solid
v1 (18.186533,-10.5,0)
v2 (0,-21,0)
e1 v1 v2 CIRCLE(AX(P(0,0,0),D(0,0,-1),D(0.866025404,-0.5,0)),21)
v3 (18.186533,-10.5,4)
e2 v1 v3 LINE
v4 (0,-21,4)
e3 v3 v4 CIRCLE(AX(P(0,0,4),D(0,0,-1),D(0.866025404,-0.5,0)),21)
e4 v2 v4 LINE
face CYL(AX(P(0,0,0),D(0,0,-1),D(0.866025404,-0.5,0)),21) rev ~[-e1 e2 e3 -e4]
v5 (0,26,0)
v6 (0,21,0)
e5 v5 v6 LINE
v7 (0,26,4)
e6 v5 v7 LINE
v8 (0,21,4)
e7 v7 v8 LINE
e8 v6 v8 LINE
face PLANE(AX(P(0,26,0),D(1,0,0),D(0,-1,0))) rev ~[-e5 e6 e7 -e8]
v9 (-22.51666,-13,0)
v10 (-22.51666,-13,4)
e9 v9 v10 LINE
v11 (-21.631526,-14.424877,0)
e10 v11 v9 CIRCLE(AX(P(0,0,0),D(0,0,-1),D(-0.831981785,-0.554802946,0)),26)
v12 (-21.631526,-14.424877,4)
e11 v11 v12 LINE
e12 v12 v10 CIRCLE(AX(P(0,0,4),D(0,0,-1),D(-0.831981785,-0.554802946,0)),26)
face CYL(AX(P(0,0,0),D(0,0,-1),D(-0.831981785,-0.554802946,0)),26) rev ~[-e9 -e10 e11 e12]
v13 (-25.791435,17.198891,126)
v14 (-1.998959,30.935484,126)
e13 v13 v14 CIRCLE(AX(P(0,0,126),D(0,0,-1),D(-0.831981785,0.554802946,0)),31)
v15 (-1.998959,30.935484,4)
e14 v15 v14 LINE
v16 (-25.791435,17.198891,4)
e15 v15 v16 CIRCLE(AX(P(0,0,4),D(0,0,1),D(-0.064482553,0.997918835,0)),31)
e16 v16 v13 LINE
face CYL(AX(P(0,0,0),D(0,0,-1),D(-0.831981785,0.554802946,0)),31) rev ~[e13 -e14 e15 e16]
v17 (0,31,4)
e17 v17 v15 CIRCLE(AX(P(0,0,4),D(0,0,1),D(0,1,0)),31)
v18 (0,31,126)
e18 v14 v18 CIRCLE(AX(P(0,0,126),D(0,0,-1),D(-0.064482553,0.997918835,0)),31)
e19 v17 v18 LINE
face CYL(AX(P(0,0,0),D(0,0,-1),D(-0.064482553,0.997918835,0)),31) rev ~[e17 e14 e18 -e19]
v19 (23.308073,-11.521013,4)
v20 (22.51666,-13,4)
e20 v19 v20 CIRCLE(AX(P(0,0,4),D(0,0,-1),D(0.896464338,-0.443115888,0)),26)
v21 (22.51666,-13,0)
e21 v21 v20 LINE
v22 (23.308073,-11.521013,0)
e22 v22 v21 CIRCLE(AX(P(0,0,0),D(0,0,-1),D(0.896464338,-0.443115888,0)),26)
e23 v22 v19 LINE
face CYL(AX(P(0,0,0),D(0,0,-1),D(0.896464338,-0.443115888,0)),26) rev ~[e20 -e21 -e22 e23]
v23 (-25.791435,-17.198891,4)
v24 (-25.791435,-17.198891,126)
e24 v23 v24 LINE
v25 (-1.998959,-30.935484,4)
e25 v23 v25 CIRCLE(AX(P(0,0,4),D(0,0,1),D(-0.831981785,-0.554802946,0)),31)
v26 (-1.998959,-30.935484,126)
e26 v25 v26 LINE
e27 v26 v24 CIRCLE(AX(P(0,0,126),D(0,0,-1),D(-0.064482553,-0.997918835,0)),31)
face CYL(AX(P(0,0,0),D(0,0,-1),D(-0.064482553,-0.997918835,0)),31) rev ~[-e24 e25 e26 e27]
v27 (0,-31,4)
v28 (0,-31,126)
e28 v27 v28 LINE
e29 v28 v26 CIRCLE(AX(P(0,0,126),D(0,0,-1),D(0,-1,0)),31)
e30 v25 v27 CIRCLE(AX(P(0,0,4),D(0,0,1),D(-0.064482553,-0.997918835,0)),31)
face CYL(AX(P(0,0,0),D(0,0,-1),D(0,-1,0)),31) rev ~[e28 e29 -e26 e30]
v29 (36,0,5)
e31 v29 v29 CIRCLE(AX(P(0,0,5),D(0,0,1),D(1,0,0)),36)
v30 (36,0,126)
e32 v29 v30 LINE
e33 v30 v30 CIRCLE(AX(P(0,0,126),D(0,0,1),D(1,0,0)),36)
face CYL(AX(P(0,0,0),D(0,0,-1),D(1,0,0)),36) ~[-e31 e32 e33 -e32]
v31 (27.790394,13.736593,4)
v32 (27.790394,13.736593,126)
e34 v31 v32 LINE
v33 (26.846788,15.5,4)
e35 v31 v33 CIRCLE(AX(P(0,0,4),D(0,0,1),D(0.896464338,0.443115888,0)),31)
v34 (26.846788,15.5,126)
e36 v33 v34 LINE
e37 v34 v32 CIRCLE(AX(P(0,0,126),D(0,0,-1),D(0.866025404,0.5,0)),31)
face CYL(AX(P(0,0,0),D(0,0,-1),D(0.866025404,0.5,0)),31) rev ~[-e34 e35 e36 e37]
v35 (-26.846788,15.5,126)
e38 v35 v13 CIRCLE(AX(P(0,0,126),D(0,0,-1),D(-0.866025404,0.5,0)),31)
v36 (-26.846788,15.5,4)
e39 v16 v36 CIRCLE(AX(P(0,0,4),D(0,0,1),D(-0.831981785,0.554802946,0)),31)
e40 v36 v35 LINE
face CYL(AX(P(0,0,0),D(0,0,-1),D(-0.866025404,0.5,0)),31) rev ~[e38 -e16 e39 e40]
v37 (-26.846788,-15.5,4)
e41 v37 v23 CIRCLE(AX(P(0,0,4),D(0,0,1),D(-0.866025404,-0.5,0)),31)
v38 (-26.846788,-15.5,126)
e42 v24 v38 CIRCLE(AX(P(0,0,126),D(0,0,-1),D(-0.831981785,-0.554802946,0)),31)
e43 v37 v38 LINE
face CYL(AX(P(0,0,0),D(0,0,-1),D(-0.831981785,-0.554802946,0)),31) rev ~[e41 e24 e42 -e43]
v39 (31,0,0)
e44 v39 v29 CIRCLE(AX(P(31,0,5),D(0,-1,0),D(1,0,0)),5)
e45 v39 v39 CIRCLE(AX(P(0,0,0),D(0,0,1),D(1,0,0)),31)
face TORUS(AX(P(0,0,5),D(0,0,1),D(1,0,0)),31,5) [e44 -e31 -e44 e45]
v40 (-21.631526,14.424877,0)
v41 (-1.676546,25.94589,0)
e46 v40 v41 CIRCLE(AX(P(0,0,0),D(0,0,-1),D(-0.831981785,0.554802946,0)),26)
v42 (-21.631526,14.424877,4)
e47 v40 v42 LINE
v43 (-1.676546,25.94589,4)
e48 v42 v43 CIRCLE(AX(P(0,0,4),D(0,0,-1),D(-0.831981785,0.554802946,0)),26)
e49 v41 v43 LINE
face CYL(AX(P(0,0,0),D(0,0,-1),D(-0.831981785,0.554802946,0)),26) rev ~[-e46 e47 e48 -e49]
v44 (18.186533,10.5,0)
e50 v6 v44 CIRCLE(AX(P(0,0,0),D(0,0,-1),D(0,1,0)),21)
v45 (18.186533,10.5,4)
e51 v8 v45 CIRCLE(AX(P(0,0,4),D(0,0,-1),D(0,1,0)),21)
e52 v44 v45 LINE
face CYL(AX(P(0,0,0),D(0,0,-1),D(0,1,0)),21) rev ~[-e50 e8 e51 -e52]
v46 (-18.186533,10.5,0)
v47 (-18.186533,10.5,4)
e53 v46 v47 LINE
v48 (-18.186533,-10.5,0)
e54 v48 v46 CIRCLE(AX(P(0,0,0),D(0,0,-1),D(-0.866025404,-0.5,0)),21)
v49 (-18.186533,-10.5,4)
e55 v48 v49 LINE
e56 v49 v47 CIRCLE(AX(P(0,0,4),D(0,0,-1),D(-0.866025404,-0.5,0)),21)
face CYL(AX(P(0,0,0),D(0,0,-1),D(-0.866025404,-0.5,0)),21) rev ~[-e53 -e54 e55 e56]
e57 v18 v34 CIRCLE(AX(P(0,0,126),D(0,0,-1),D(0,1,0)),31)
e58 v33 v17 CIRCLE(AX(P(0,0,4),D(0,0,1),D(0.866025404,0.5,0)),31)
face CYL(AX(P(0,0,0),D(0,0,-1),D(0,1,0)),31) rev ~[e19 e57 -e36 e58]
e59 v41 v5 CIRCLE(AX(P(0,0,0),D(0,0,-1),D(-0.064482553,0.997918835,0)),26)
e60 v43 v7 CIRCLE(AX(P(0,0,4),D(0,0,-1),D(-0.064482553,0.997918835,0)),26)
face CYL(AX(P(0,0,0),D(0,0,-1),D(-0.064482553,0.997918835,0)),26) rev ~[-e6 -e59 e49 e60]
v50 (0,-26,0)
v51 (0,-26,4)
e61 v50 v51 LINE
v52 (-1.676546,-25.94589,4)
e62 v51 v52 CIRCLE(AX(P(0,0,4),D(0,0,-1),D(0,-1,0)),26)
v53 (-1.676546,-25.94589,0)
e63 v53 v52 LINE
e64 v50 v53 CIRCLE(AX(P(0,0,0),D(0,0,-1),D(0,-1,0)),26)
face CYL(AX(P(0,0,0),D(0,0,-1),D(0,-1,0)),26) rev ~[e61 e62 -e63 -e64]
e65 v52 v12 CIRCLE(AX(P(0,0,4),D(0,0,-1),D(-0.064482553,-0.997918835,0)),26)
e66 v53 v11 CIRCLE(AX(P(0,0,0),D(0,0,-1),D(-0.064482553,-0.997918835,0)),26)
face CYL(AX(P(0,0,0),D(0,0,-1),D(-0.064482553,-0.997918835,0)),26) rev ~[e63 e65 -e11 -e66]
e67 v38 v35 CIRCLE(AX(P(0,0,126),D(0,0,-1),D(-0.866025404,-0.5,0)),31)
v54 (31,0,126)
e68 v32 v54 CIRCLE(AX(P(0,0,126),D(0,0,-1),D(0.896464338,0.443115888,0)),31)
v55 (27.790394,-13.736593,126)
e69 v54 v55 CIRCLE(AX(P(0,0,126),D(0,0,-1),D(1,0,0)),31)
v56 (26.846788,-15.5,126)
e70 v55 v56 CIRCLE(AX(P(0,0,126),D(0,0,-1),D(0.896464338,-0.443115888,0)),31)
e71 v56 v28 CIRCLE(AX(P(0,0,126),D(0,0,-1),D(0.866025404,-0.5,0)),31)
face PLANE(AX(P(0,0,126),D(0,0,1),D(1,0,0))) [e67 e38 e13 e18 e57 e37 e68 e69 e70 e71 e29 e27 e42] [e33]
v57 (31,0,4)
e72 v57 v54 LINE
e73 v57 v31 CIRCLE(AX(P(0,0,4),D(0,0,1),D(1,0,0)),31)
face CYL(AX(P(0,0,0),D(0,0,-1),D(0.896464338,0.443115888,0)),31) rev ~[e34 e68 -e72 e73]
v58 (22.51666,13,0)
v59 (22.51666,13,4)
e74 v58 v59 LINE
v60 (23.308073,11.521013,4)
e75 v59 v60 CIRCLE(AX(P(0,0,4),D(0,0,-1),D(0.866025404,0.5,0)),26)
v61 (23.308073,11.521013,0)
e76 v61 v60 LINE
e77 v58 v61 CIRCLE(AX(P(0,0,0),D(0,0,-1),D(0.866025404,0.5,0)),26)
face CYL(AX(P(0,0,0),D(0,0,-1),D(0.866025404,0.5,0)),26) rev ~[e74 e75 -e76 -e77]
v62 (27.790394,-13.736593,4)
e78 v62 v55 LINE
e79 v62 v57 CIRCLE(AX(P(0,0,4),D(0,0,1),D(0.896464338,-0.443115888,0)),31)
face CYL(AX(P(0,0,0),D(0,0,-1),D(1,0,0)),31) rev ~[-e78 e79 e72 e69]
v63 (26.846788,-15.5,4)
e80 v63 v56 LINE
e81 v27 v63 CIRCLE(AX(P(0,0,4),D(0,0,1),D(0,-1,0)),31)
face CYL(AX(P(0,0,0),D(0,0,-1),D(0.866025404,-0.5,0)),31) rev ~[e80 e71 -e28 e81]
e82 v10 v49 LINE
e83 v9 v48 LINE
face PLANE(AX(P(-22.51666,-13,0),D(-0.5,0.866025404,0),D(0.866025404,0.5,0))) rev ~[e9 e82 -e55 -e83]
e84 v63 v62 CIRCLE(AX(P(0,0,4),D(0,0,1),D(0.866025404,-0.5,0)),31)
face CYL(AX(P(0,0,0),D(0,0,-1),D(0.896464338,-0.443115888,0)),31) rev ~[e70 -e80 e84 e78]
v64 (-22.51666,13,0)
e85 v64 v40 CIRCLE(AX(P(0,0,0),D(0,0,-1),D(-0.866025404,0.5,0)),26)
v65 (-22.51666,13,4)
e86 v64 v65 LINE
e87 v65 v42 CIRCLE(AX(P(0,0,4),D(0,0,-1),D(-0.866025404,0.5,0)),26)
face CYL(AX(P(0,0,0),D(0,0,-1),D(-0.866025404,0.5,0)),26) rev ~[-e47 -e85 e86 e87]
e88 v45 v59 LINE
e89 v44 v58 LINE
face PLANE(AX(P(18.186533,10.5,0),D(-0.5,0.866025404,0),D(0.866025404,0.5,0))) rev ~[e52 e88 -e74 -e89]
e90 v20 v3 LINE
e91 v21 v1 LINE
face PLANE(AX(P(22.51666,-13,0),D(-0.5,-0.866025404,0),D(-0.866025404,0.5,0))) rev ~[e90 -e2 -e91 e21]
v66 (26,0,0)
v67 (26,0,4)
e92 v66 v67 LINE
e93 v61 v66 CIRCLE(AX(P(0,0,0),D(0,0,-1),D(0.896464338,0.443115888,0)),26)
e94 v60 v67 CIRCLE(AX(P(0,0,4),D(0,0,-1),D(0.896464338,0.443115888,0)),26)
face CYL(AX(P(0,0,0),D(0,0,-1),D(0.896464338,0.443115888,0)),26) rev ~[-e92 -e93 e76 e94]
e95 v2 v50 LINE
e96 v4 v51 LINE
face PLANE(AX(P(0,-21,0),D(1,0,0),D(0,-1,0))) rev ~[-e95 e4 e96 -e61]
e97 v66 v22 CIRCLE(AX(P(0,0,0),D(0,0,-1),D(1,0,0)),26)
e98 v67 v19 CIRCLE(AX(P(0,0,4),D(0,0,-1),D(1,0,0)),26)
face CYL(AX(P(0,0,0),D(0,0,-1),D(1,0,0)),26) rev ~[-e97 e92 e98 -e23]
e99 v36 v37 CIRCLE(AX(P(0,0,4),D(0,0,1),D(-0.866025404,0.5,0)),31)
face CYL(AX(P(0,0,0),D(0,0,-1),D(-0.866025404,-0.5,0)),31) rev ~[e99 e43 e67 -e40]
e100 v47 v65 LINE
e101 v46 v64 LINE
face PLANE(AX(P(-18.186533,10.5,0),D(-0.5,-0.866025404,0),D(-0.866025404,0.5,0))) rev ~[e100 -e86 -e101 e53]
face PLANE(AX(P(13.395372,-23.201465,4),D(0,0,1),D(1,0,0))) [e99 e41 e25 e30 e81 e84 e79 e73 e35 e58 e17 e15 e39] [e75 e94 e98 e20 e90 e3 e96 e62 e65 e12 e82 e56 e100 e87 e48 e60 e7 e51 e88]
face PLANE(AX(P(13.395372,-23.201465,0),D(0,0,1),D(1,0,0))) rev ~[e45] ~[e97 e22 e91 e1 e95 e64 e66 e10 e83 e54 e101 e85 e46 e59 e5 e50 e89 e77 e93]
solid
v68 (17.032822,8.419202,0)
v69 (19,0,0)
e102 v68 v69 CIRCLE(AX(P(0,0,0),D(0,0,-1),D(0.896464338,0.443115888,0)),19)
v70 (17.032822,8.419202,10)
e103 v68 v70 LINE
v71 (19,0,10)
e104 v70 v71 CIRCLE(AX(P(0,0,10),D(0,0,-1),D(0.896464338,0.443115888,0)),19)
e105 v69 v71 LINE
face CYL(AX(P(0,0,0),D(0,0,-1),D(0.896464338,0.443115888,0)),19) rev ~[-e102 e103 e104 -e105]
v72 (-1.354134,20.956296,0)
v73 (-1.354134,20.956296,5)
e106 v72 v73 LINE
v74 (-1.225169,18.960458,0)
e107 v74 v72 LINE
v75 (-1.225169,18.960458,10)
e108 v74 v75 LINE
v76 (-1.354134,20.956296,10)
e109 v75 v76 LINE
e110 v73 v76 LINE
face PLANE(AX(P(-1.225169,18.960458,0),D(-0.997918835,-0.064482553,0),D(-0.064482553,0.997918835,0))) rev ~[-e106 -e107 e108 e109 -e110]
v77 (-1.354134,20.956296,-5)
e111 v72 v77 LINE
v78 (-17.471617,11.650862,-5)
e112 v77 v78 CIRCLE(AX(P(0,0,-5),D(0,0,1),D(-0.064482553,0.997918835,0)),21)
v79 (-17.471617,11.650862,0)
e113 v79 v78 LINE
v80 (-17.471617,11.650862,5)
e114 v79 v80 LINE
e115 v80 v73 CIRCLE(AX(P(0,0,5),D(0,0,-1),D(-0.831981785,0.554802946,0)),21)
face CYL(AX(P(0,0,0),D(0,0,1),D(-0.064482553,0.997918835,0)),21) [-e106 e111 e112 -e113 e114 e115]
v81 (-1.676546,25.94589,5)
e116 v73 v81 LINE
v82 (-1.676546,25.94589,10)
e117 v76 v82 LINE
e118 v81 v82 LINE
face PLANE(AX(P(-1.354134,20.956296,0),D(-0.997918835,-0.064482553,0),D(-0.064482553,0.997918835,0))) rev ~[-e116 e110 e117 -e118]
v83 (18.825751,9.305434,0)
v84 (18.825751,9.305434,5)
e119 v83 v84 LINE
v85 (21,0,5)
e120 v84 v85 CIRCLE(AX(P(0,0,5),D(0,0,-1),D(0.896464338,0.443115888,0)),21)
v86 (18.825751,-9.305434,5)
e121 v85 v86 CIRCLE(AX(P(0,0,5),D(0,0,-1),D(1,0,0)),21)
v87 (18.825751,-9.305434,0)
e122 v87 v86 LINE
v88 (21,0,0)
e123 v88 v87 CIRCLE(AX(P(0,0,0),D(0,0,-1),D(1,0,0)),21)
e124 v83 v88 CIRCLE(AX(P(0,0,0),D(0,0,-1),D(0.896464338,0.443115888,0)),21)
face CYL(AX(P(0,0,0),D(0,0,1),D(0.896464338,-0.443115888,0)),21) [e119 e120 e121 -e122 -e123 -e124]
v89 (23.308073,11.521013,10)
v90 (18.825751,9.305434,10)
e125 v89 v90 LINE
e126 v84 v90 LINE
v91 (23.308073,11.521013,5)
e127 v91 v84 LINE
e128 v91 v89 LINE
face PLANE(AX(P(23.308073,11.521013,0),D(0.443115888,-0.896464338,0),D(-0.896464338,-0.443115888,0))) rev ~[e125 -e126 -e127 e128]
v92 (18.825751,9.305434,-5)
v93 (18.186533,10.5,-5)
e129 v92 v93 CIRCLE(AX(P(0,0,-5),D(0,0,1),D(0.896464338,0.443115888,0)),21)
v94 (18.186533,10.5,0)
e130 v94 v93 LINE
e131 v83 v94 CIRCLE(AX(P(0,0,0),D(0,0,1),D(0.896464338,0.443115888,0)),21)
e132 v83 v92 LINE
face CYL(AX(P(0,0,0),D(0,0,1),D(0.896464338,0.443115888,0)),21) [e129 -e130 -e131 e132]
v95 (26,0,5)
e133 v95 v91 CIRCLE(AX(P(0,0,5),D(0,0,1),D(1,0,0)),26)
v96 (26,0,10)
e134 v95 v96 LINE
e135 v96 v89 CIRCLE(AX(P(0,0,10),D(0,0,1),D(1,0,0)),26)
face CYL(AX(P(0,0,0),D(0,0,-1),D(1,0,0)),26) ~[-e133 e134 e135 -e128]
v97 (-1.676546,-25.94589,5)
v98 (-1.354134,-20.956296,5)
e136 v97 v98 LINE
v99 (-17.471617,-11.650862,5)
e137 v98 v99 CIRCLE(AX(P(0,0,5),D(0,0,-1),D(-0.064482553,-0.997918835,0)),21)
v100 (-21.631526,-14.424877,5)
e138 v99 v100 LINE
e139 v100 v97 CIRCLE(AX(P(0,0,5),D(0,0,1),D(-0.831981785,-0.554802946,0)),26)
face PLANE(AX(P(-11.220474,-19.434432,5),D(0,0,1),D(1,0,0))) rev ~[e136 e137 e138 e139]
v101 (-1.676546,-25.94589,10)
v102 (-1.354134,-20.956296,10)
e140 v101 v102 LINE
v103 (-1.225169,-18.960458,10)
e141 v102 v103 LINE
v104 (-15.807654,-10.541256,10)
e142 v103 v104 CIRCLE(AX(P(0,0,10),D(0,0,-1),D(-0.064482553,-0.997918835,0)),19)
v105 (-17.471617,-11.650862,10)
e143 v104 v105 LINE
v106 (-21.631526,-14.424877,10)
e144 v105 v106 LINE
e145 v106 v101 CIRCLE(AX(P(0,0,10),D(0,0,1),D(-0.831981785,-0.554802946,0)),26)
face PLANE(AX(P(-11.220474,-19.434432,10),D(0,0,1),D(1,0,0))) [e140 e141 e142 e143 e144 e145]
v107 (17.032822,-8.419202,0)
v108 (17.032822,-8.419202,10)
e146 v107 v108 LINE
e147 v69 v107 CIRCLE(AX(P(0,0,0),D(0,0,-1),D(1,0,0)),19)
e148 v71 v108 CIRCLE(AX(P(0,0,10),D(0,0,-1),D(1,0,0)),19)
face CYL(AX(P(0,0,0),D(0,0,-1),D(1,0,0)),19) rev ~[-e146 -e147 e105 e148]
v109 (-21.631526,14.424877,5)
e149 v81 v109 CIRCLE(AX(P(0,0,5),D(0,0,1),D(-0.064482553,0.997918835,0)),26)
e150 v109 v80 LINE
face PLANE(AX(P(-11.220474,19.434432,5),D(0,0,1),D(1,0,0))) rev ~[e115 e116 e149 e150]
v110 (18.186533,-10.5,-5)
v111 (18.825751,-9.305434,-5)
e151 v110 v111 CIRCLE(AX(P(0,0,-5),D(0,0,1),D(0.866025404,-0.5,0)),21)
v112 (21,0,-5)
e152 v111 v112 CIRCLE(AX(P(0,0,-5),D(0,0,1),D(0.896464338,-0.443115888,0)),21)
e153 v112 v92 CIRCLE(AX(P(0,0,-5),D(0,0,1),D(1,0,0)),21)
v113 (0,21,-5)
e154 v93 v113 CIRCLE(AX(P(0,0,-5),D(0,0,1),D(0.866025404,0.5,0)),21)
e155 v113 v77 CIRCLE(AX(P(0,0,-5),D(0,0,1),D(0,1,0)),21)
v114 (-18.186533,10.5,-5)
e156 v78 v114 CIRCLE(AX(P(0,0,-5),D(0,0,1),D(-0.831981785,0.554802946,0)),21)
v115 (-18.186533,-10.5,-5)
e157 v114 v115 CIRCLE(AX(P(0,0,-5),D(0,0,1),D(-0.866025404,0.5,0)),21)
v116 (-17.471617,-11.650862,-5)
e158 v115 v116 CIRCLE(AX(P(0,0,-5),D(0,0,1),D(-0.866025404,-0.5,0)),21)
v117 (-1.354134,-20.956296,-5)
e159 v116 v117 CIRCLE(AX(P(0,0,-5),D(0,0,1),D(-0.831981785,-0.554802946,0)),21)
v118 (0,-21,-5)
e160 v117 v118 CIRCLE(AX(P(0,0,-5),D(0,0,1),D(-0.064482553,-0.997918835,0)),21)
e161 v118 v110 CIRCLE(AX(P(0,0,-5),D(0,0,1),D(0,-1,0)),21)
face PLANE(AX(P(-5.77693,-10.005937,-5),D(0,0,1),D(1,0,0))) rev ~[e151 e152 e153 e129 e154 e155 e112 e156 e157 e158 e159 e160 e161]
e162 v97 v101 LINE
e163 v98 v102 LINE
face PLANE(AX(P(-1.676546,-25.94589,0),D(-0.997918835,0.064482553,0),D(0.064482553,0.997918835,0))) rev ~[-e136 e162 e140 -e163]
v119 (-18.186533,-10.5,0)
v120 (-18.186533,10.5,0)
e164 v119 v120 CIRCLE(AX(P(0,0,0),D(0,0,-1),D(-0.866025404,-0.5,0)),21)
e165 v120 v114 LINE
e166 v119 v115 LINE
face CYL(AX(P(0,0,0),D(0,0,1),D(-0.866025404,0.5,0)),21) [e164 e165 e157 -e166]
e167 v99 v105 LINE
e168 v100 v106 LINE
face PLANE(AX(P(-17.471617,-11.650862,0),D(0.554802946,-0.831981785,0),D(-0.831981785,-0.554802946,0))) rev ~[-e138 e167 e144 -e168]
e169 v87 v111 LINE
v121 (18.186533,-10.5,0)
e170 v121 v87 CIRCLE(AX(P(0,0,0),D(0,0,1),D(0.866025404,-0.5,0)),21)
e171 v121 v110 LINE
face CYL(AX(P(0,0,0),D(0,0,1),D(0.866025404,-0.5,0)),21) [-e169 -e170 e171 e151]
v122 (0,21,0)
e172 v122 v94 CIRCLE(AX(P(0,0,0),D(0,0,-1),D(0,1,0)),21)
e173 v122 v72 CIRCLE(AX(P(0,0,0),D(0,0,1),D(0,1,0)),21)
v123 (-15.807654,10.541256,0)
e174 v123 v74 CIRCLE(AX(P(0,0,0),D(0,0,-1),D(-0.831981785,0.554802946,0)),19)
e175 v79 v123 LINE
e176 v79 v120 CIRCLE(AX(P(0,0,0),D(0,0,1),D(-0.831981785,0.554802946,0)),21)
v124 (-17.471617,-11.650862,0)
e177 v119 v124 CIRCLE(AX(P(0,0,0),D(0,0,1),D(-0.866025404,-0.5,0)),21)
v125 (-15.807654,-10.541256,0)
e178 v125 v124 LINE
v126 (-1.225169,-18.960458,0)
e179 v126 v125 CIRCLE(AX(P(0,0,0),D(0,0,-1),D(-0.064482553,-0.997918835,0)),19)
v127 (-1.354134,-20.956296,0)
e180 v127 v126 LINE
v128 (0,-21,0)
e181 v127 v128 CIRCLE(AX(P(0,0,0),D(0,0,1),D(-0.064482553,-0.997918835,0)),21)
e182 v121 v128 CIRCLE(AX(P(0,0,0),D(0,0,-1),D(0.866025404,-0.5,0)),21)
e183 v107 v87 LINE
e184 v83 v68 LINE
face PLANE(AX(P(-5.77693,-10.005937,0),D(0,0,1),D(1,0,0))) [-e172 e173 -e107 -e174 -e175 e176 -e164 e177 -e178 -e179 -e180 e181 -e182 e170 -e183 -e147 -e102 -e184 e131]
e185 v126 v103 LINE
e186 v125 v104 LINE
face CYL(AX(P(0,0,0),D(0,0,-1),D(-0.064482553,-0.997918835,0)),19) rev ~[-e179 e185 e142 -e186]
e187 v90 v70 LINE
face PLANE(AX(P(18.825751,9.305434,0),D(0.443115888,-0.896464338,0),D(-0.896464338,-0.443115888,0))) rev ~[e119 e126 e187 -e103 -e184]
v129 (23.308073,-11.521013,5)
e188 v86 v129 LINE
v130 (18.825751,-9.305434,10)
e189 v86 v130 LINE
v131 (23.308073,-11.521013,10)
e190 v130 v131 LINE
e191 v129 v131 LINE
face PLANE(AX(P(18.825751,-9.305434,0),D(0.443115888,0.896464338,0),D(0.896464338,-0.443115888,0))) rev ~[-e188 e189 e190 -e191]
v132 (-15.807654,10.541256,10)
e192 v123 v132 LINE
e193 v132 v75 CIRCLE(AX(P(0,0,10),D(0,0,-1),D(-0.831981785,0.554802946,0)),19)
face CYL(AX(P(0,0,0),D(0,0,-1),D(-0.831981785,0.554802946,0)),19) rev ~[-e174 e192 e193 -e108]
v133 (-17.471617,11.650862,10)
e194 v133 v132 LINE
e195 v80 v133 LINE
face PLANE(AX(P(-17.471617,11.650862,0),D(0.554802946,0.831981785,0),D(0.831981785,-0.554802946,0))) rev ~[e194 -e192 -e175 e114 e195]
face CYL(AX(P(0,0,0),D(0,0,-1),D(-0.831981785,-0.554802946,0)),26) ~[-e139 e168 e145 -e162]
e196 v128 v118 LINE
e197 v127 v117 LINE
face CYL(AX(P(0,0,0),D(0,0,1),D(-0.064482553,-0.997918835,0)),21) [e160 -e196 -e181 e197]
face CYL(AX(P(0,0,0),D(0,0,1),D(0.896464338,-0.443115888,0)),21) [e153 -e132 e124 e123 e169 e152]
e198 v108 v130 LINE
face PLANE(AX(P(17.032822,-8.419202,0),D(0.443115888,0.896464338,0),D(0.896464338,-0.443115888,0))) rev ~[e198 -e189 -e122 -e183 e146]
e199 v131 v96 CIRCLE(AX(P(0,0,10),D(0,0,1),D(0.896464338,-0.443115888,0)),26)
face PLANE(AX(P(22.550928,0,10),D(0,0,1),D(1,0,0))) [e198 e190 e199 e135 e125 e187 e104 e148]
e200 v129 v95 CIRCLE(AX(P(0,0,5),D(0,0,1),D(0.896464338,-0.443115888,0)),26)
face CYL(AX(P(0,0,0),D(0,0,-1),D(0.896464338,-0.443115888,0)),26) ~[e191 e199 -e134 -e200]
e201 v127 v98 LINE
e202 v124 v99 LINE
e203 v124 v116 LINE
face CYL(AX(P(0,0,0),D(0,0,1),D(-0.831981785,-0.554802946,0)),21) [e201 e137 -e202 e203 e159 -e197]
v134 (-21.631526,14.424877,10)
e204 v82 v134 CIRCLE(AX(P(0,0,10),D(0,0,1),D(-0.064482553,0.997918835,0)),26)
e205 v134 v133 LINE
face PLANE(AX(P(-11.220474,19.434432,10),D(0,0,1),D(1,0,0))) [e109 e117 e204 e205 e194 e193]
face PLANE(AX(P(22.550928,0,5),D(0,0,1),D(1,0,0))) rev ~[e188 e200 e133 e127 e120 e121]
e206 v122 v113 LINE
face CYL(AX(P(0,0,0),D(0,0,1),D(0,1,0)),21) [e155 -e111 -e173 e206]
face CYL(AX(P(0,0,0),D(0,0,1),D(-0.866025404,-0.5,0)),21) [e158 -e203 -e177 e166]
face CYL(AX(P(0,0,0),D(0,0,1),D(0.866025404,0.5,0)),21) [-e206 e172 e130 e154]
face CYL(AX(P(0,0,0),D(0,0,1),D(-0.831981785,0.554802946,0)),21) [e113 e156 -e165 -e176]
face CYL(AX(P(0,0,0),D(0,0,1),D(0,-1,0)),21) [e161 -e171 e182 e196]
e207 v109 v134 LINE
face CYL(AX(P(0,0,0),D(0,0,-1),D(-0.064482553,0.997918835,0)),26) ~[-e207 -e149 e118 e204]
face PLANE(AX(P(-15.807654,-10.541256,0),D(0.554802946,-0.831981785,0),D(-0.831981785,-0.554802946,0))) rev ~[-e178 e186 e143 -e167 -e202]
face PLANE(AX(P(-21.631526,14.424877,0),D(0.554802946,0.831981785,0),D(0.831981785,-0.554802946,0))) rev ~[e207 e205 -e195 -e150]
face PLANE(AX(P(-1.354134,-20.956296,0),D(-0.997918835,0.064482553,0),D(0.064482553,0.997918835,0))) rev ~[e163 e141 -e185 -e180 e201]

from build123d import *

# Parameters (mm, degrees)
F0_R     = 36
F1_DEPTH = 126
F2_DEPTH = 4
F3_R     = 5
F4_DEPTH = 10
F5_DEPTH = 5
F6_DEPTH = 5


# Not quite as in the source:
# - a feature names something its author has since deleted; it is built from what else it names


with BuildPart() as f1:
    # F0 (on Top) → F1 (new body)
    with BuildSketch(Plane.XY):
        Circle(F0_R)
        with BuildLine():
            ThreePointArc((27.7903944838, 13.7365925335), (30.1869361562, 7.0532889846), (31, 0))
            ThreePointArc((31, 0), (30.1869361562, -7.0532889846), (27.7903944838, -13.7365925335))
            ThreePointArc((27.7903944838, -13.7365925335), (27.33281573, -14.625907981), (26.8467875173, -15.5))
            ThreePointArc((26.8467875173, -15.5), (15.5, -26.8467875173), (0, -31))
            ThreePointArc((0, -31), (-1, -30.9838667697), (-1.9989591464, -30.935483871))
            ThreePointArc((-1.9989591464, -30.935483871), (-15.5, -26.8467875173), (-25.7914353374, -17.1988913374))
            ThreePointArc((-25.7914353374, -17.1988913374), (-26.33281573, -16.3579587886), (-26.8467875173, -15.5))
            ThreePointArc((-26.8467875173, -15.5), (-31, 0), (-26.8467875173, 15.5))
            ThreePointArc((-26.8467875173, 15.5), (-26.33281573, 16.3579587886), (-25.7914353374, 17.1988913374))
            ThreePointArc((-25.7914353374, 17.1988913374), (-15.5, 26.8467875173), (-1.9989591464, 30.935483871))
            ThreePointArc((-1.9989591464, 30.935483871), (-1, 30.9838667697), (0, 31))
            ThreePointArc((0, 31), (15.5, 26.8467875173), (26.8467875173, 15.5))
            ThreePointArc((26.8467875173, 15.5), (27.33281573, 14.625907981), (27.7903944838, 13.7365925335))
        make_face(mode=Mode.SUBTRACT)
    extrude(amount=F1_DEPTH)

    # F0 (on Top) → F2 (join)
    with BuildSketch(Plane.XY):
        with BuildLine():
            ThreePointArc((0, -31), (15.5, -26.8467875173), (26.8467875173, -15.5))
            Line((26.8467875173, -15.5), (22.5166604984, -13))
            ThreePointArc((22.5166604984, -13), (13, -22.5166604984), (0, -26))
            Line((0, -26), (0, -31))
        make_face()
        with BuildLine():
            ThreePointArc((0, -26), (13, -22.5166604984), (22.5166604984, -13))
            Line((22.5166604984, -13), (18.1865334795, -10.5))
            ThreePointArc((18.1865334795, -10.5), (10.5, -18.1865334795), (0, -21))
            Line((0, -21), (0, -26))
        make_face()
        with BuildLine():
            Line((-22.5166604984, 13), (-26.8467875173, 15.5))
            ThreePointArc((-26.8467875173, 15.5), (-31, 0), (-26.8467875173, -15.5))
            Line((-26.8467875173, -15.5), (-22.5166604984, -13))
            ThreePointArc((-22.5166604984, -13), (-26, 0), (-22.5166604984, 13))
        make_face()
        with BuildLine():
            Line((-18.1865334795, 10.5), (-22.5166604984, 13))
            ThreePointArc((-22.5166604984, 13), (-26, 0), (-22.5166604984, -13))
            Line((-22.5166604984, -13), (-18.1865334795, -10.5))
            ThreePointArc((-18.1865334795, -10.5), (-21, 0), (-18.1865334795, 10.5))
        make_face()
        with BuildLine():
            ThreePointArc((-26.8467875173, -15.5), (-26.33281573, -16.3579587886), (-25.7914353374, -17.1988913374))
            Line((-25.7914353374, -17.1988913374), (-21.631526412, -14.4248766056))
            ThreePointArc((-21.631526412, -14.4248766056), (-22.0855873864, -13.7195783388), (-22.5166604984, -13))
            Line((-22.5166604984, -13), (-26.8467875173, -15.5))
        make_face()
        with BuildLine():
            Line((0, 26), (0, 31))
            ThreePointArc((0, 31), (-1, 30.9838667697), (-1.9989591464, 30.935483871))
            Line((-1.9989591464, 30.935483871), (-1.6765463809, 25.9458896982))
            ThreePointArc((-1.6765463809, 25.9458896982), (-0.8387096774, 25.9864689036), (0, 26))
        make_face()
        with BuildLine():
            Line((22.5166604984, 13), (26.8467875173, 15.5))
            ThreePointArc((26.8467875173, 15.5), (15.5, 26.8467875173), (0, 31))
            Line((0, 31), (0, 26))
            ThreePointArc((0, 26), (13, 22.5166604984), (22.5166604984, 13))
        make_face()
        with BuildLine():
            Line((-1.6765463809, 25.9458896982), (-1.9989591464, 30.935483871))
            ThreePointArc((-1.9989591464, 30.935483871), (-15.5, 26.8467875173), (-25.7914353374, 17.1988913374))
            Line((-25.7914353374, 17.1988913374), (-21.631526412, 14.4248766056))
            ThreePointArc((-21.631526412, 14.4248766056), (-13, 22.5166604984), (-1.6765463809, 25.9458896982))
        make_face()
        with BuildLine():
            Line((18.1865334795, 10.5), (22.5166604984, 13))
            ThreePointArc((22.5166604984, 13), (13, 22.5166604984), (0, 26))
            Line((0, 26), (0, 21))
            ThreePointArc((0, 21), (10.5, 18.1865334795), (18.1865334795, 10.5))
        make_face()
        with BuildLine():
            Line((-21.631526412, 14.4248766056), (-25.7914353374, 17.1988913374))
            ThreePointArc((-25.7914353374, 17.1988913374), (-26.33281573, 16.3579587886), (-26.8467875173, 15.5))
            Line((-26.8467875173, 15.5), (-22.5166604984, 13))
            ThreePointArc((-22.5166604984, 13), (-22.0855873864, 13.7195783388), (-21.631526412, 14.4248766056))
        make_face()
        with BuildLine():
            Line((23.3080727929, 11.5210130927), (27.7903944838, 13.7365925335))
            ThreePointArc((27.7903944838, 13.7365925335), (27.33281573, 14.625907981), (26.8467875173, 15.5))
            Line((26.8467875173, 15.5), (22.5166604984, 13))
            ThreePointArc((22.5166604984, 13), (22.9242970639, 12.2668905647), (23.3080727929, 11.5210130927))
        make_face()
        with BuildLine():
            ThreePointArc((27.7903944838, -13.7365925335), (30.1869361562, -7.0532889846), (31, 0))
            ThreePointArc((31, 0), (30.1869361562, 7.0532889846), (27.7903944838, 13.7365925335))
            Line((27.7903944838, 13.7365925335), (23.3080727929, 11.5210130927))
            ThreePointArc((23.3080727929, 11.5210130927), (25.3180754859, 5.915661729), (26, 0))
            ThreePointArc((26, 0), (25.3180754859, -5.915661729), (23.3080727929, -11.5210130927))
            Line((23.3080727929, -11.5210130927), (27.7903944838, -13.7365925335))
        make_face()
        with BuildLine():
            ThreePointArc((26.8467875173, -15.5), (27.33281573, -14.625907981), (27.7903944838, -13.7365925335))
            Line((27.7903944838, -13.7365925335), (23.3080727929, -11.5210130927))
            ThreePointArc((23.3080727929, -11.5210130927), (22.9242970639, -12.2668905647), (22.5166604984, -13))
            Line((22.5166604984, -13), (26.8467875173, -15.5))
        make_face()
        with BuildLine():
            ThreePointArc((-1.9989591464, -30.935483871), (-1, -30.9838667697), (0, -31))
            Line((0, -31), (0, -26))
            ThreePointArc((0, -26), (-0.8387096774, -25.9864689036), (-1.6765463809, -25.9458896982))
            Line((-1.6765463809, -25.9458896982), (-1.9989591464, -30.935483871))
        make_face()
        with BuildLine():
            ThreePointArc((-25.7914353374, -17.1988913374), (-15.5, -26.8467875173), (-1.9989591464, -30.935483871))
            Line((-1.9989591464, -30.935483871), (-1.6765463809, -25.9458896982))
            ThreePointArc((-1.6765463809, -25.9458896982), (-13, -22.5166604984), (-21.631526412, -14.4248766056))
            Line((-21.631526412, -14.4248766056), (-25.7914353374, -17.1988913374))
        make_face()
    extrude(amount=F2_DEPTH)

    # F3
    f3_edges = [f1.edges().sort_by_distance(p)[0] for p in [
        (-36, 0, 0),
    ]]
    fillet(f3_edges, radius=F3_R)



with BuildPart() as f4:
    # F0 (on Top) → F4 (new body)
    with BuildSketch(Plane.XY):
        with BuildLine():
            ThreePointArc((26, 0), (25.3180754859, 5.915661729), (23.3080727929, 11.5210130927))
            Line((23.3080727929, 11.5210130927), (18.825751102, 9.3054336518))
            ThreePointArc((18.825751102, 9.3054336518), (20.4492148155, 4.7780344735), (21, 0))
            ThreePointArc((21, 0), (20.4492148155, -4.7780344735), (18.825751102, -9.3054336518))
            Line((18.825751102, -9.3054336518), (23.3080727929, -11.5210130927))
            ThreePointArc((23.3080727929, -11.5210130927), (25.3180754859, -5.915661729), (26, 0))
        make_face()
        with BuildLine():
            ThreePointArc((-21.631526412, -14.4248766056), (-13, -22.5166604984), (-1.6765463809, -25.9458896982))
            Line((-1.6765463809, -25.9458896982), (-1.3541336153, -20.9562955255))
            ThreePointArc((-1.3541336153, -20.9562955255), (-10.5, -18.1865334795), (-17.4716174866, -11.6508618737))
            Line((-17.4716174866, -11.6508618737), (-21.631526412, -14.4248766056))
        make_face()
        with BuildLine():
            Line((-1.3541336153, 20.9562955255), (-1.6765463809, 25.9458896982))
            ThreePointArc((-1.6765463809, 25.9458896982), (-13, 22.5166604984), (-21.631526412, 14.4248766056))
            Line((-21.631526412, 14.4248766056), (-17.4716174866, 11.6508618737))
            ThreePointArc((-17.4716174866, 11.6508618737), (-10.5, 18.1865334795), (-1.3541336153, 20.9562955255))
        make_face()
        with BuildLine():
            ThreePointArc((-15.8076539165, 10.541255981), (-9.5, 16.4544826719), (-1.2251685091, 18.9604578564))
            Line((-1.2251685091, 18.9604578564), (-1.3541336153, 20.9562955255))
            ThreePointArc((-1.3541336153, 20.9562955255), (-10.5, 18.1865334795), (-17.4716174866, 11.6508618737))
            Line((-17.4716174866, 11.6508618737), (-15.8076539165, 10.541255981))
        make_face()
        with BuildLine():
            Line((-1.3541336153, -20.9562955255), (-1.2251685091, -18.9604578564))
            ThreePointArc((-1.2251685091, -18.9604578564), (-9.5, -16.4544826719), (-15.8076539165, -10.541255981))
            Line((-15.8076539165, -10.541255981), (-17.4716174866, -11.6508618737))
            ThreePointArc((-17.4716174866, -11.6508618737), (-10.5, -18.1865334795), (-1.3541336153, -20.9562955255))
        make_face()
        with BuildLine():
            ThreePointArc((21, 0), (20.4492148155, 4.7780344735), (18.825751102, 9.3054336518))
            Line((18.825751102, 9.3054336518), (17.0328224256, 8.4192018754))
            ThreePointArc((17.0328224256, 8.4192018754), (18.5016705474, 4.3229835712), (19, 0))
            ThreePointArc((19, 0), (18.5016705474, -4.3229835712), (17.0328224256, -8.4192018754))
            Line((17.0328224256, -8.4192018754), (18.825751102, -9.3054336518))
            ThreePointArc((18.825751102, -9.3054336518), (20.4492148155, -4.7780344735), (21, 0))
        make_face()
    extrude(amount=F4_DEPTH)

    # F0 (on Top) → F5 (cut)
    with BuildSketch(Plane.XY):
        with BuildLine():
            ThreePointArc((-21.631526412, -14.4248766056), (-13, -22.5166604984), (-1.6765463809, -25.9458896982))
            Line((-1.6765463809, -25.9458896982), (-1.3541336153, -20.9562955255))
            ThreePointArc((-1.3541336153, -20.9562955255), (-10.5, -18.1865334795), (-17.4716174866, -11.6508618737))
            Line((-17.4716174866, -11.6508618737), (-21.631526412, -14.4248766056))
        make_face()
        with BuildLine():
            ThreePointArc((26, 0), (25.3180754859, 5.915661729), (23.3080727929, 11.5210130927))
            Line((23.3080727929, 11.5210130927), (18.825751102, 9.3054336518))
            ThreePointArc((18.825751102, 9.3054336518), (20.4492148155, 4.7780344735), (21, 0))
            ThreePointArc((21, 0), (20.4492148155, -4.7780344735), (18.825751102, -9.3054336518))
            Line((18.825751102, -9.3054336518), (23.3080727929, -11.5210130927))
            ThreePointArc((23.3080727929, -11.5210130927), (25.3180754859, -5.915661729), (26, 0))
        make_face()
        with BuildLine():
            Line((-1.3541336153, 20.9562955255), (-1.6765463809, 25.9458896982))
            ThreePointArc((-1.6765463809, 25.9458896982), (-13, 22.5166604984), (-21.631526412, 14.4248766056))
            Line((-21.631526412, 14.4248766056), (-17.4716174866, 11.6508618737))
            ThreePointArc((-17.4716174866, 11.6508618737), (-10.5, 18.1865334795), (-1.3541336153, 20.9562955255))
        make_face()
    extrude(amount=F5_DEPTH, mode=Mode.SUBTRACT)


with BuildPart() as f1_1:
    add(f1.part)

    add(f4.part)  # F6 merges F4
    # F0 (on Top) → F6 (join)
    with BuildSketch(Plane.XY):
        with BuildLine():
            Line((-1.2251685091, -18.9604578564), (0, 0))
            Line((0, 0), (-15.8076539165, -10.541255981))
            ThreePointArc((-15.8076539165, -10.541255981), (-9.5, -16.4544826719), (-1.2251685091, -18.9604578564))
        make_face()
        with BuildLine():
            ThreePointArc((-1.2251685091, -18.9604578564), (9.5, -16.4544826719), (17.0328224256, -8.4192018754))
            Line((17.0328224256, -8.4192018754), (0, 0))
            Line((0, 0), (-1.2251685091, -18.9604578564))
        make_face()
        with BuildLine():
            ThreePointArc((19, 0), (18.5016705474, 4.3229835712), (17.0328224256, 8.4192018754))
            Line((17.0328224256, 8.4192018754), (0, 0))
            Line((0, 0), (17.0328224256, -8.4192018754))
            ThreePointArc((17.0328224256, -8.4192018754), (18.5016705474, -4.3229835712), (19, 0))
        make_face()
        with BuildLine():
            Line((0, 0), (17.0328224256, 8.4192018754))
            ThreePointArc((17.0328224256, 8.4192018754), (9.5, 16.4544826719), (-1.2251685091, 18.9604578564))
            Line((-1.2251685091, 18.9604578564), (0, 0))
        make_face()
        with BuildLine():
            Line((0, 0), (-1.2251685091, 18.9604578564))
            ThreePointArc((-1.2251685091, 18.9604578564), (-9.5, 16.4544826719), (-15.8076539165, 10.541255981))
            Line((-15.8076539165, 10.541255981), (0, 0))
        make_face()
        with BuildLine():
            Line((-15.8076539165, -10.541255981), (0, 0))
            Line((0, 0), (-15.8076539165, 10.541255981))
            ThreePointArc((-15.8076539165, 10.541255981), (-19, 0), (-15.8076539165, -10.541255981))
        make_face()
        with BuildLine():
            Line((-1.3541336153, -20.9562955255), (-1.2251685091, -18.9604578564))
            ThreePointArc((-1.2251685091, -18.9604578564), (-9.5, -16.4544826719), (-15.8076539165, -10.541255981))
            Line((-15.8076539165, -10.541255981), (-17.4716174866, -11.6508618737))
            ThreePointArc((-17.4716174866, -11.6508618737), (-10.5, -18.1865334795), (-1.3541336153, -20.9562955255))
        make_face()
        with BuildLine():
            ThreePointArc((18.1865334795, -10.5), (18.5157783977, -9.9078731485), (18.825751102, -9.3054336518))
            Line((18.825751102, -9.3054336518), (17.0328224256, -8.4192018754))
            ThreePointArc((17.0328224256, -8.4192018754), (9.5, -16.4544826719), (-1.2251685091, -18.9604578564))
            Line((-1.2251685091, -18.9604578564), (-1.3541336153, -20.9562955255))
            ThreePointArc((-1.3541336153, -20.9562955255), (-0.6774193548, -20.9890710375), (0, -21))
            ThreePointArc((0, -21), (10.5, -18.1865334795), (18.1865334795, -10.5))
        make_face()
        with BuildLine():
            ThreePointArc((21, 0), (20.4492148155, 4.7780344735), (18.825751102, 9.3054336518))
            Line((18.825751102, 9.3054336518), (17.0328224256, 8.4192018754))
            ThreePointArc((17.0328224256, 8.4192018754), (18.5016705474, 4.3229835712), (19, 0))
            ThreePointArc((19, 0), (18.5016705474, -4.3229835712), (17.0328224256, -8.4192018754))
            Line((17.0328224256, -8.4192018754), (18.825751102, -9.3054336518))
            ThreePointArc((18.825751102, -9.3054336518), (20.4492148155, -4.7780344735), (21, 0))
        make_face()
        with BuildLine():
            Line((17.0328224256, 8.4192018754), (18.825751102, 9.3054336518))
            ThreePointArc((18.825751102, 9.3054336518), (18.5157783977, 9.9078731485), (18.1865334795, 10.5))
            ThreePointArc((18.1865334795, 10.5), (10.5, 18.1865334795), (0, 21))
            ThreePointArc((0, 21), (-0.6774193548, 20.9890710375), (-1.3541336153, 20.9562955255))
            Line((-1.3541336153, 20.9562955255), (-1.2251685091, 18.9604578564))
            ThreePointArc((-1.2251685091, 18.9604578564), (9.5, 16.4544826719), (17.0328224256, 8.4192018754))
        make_face()
        with BuildLine():
            ThreePointArc((-15.8076539165, 10.541255981), (-9.5, 16.4544826719), (-1.2251685091, 18.9604578564))
            Line((-1.2251685091, 18.9604578564), (-1.3541336153, 20.9562955255))
            ThreePointArc((-1.3541336153, 20.9562955255), (-10.5, 18.1865334795), (-17.4716174866, 11.6508618737))
            Line((-17.4716174866, 11.6508618737), (-15.8076539165, 10.541255981))
        make_face()
        with BuildLine():
            ThreePointArc((-15.8076539165, -10.541255981), (-19, 0), (-15.8076539165, 10.541255981))
            Line((-15.8076539165, 10.541255981), (-17.4716174866, 11.6508618737))
            ThreePointArc((-17.4716174866, 11.6508618737), (-17.8383590429, 11.0811978891), (-18.1865334795, 10.5))
            ThreePointArc((-18.1865334795, 10.5), (-21, 0), (-18.1865334795, -10.5))
            ThreePointArc((-18.1865334795, -10.5), (-17.8383590429, -11.0811978891), (-17.4716174866, -11.6508618737))
            Line((-17.4716174866, -11.6508618737), (-15.8076539165, -10.541255981))
        make_face()
    extrude(amount=-F6_DEPTH)


solid = f1_1.part
